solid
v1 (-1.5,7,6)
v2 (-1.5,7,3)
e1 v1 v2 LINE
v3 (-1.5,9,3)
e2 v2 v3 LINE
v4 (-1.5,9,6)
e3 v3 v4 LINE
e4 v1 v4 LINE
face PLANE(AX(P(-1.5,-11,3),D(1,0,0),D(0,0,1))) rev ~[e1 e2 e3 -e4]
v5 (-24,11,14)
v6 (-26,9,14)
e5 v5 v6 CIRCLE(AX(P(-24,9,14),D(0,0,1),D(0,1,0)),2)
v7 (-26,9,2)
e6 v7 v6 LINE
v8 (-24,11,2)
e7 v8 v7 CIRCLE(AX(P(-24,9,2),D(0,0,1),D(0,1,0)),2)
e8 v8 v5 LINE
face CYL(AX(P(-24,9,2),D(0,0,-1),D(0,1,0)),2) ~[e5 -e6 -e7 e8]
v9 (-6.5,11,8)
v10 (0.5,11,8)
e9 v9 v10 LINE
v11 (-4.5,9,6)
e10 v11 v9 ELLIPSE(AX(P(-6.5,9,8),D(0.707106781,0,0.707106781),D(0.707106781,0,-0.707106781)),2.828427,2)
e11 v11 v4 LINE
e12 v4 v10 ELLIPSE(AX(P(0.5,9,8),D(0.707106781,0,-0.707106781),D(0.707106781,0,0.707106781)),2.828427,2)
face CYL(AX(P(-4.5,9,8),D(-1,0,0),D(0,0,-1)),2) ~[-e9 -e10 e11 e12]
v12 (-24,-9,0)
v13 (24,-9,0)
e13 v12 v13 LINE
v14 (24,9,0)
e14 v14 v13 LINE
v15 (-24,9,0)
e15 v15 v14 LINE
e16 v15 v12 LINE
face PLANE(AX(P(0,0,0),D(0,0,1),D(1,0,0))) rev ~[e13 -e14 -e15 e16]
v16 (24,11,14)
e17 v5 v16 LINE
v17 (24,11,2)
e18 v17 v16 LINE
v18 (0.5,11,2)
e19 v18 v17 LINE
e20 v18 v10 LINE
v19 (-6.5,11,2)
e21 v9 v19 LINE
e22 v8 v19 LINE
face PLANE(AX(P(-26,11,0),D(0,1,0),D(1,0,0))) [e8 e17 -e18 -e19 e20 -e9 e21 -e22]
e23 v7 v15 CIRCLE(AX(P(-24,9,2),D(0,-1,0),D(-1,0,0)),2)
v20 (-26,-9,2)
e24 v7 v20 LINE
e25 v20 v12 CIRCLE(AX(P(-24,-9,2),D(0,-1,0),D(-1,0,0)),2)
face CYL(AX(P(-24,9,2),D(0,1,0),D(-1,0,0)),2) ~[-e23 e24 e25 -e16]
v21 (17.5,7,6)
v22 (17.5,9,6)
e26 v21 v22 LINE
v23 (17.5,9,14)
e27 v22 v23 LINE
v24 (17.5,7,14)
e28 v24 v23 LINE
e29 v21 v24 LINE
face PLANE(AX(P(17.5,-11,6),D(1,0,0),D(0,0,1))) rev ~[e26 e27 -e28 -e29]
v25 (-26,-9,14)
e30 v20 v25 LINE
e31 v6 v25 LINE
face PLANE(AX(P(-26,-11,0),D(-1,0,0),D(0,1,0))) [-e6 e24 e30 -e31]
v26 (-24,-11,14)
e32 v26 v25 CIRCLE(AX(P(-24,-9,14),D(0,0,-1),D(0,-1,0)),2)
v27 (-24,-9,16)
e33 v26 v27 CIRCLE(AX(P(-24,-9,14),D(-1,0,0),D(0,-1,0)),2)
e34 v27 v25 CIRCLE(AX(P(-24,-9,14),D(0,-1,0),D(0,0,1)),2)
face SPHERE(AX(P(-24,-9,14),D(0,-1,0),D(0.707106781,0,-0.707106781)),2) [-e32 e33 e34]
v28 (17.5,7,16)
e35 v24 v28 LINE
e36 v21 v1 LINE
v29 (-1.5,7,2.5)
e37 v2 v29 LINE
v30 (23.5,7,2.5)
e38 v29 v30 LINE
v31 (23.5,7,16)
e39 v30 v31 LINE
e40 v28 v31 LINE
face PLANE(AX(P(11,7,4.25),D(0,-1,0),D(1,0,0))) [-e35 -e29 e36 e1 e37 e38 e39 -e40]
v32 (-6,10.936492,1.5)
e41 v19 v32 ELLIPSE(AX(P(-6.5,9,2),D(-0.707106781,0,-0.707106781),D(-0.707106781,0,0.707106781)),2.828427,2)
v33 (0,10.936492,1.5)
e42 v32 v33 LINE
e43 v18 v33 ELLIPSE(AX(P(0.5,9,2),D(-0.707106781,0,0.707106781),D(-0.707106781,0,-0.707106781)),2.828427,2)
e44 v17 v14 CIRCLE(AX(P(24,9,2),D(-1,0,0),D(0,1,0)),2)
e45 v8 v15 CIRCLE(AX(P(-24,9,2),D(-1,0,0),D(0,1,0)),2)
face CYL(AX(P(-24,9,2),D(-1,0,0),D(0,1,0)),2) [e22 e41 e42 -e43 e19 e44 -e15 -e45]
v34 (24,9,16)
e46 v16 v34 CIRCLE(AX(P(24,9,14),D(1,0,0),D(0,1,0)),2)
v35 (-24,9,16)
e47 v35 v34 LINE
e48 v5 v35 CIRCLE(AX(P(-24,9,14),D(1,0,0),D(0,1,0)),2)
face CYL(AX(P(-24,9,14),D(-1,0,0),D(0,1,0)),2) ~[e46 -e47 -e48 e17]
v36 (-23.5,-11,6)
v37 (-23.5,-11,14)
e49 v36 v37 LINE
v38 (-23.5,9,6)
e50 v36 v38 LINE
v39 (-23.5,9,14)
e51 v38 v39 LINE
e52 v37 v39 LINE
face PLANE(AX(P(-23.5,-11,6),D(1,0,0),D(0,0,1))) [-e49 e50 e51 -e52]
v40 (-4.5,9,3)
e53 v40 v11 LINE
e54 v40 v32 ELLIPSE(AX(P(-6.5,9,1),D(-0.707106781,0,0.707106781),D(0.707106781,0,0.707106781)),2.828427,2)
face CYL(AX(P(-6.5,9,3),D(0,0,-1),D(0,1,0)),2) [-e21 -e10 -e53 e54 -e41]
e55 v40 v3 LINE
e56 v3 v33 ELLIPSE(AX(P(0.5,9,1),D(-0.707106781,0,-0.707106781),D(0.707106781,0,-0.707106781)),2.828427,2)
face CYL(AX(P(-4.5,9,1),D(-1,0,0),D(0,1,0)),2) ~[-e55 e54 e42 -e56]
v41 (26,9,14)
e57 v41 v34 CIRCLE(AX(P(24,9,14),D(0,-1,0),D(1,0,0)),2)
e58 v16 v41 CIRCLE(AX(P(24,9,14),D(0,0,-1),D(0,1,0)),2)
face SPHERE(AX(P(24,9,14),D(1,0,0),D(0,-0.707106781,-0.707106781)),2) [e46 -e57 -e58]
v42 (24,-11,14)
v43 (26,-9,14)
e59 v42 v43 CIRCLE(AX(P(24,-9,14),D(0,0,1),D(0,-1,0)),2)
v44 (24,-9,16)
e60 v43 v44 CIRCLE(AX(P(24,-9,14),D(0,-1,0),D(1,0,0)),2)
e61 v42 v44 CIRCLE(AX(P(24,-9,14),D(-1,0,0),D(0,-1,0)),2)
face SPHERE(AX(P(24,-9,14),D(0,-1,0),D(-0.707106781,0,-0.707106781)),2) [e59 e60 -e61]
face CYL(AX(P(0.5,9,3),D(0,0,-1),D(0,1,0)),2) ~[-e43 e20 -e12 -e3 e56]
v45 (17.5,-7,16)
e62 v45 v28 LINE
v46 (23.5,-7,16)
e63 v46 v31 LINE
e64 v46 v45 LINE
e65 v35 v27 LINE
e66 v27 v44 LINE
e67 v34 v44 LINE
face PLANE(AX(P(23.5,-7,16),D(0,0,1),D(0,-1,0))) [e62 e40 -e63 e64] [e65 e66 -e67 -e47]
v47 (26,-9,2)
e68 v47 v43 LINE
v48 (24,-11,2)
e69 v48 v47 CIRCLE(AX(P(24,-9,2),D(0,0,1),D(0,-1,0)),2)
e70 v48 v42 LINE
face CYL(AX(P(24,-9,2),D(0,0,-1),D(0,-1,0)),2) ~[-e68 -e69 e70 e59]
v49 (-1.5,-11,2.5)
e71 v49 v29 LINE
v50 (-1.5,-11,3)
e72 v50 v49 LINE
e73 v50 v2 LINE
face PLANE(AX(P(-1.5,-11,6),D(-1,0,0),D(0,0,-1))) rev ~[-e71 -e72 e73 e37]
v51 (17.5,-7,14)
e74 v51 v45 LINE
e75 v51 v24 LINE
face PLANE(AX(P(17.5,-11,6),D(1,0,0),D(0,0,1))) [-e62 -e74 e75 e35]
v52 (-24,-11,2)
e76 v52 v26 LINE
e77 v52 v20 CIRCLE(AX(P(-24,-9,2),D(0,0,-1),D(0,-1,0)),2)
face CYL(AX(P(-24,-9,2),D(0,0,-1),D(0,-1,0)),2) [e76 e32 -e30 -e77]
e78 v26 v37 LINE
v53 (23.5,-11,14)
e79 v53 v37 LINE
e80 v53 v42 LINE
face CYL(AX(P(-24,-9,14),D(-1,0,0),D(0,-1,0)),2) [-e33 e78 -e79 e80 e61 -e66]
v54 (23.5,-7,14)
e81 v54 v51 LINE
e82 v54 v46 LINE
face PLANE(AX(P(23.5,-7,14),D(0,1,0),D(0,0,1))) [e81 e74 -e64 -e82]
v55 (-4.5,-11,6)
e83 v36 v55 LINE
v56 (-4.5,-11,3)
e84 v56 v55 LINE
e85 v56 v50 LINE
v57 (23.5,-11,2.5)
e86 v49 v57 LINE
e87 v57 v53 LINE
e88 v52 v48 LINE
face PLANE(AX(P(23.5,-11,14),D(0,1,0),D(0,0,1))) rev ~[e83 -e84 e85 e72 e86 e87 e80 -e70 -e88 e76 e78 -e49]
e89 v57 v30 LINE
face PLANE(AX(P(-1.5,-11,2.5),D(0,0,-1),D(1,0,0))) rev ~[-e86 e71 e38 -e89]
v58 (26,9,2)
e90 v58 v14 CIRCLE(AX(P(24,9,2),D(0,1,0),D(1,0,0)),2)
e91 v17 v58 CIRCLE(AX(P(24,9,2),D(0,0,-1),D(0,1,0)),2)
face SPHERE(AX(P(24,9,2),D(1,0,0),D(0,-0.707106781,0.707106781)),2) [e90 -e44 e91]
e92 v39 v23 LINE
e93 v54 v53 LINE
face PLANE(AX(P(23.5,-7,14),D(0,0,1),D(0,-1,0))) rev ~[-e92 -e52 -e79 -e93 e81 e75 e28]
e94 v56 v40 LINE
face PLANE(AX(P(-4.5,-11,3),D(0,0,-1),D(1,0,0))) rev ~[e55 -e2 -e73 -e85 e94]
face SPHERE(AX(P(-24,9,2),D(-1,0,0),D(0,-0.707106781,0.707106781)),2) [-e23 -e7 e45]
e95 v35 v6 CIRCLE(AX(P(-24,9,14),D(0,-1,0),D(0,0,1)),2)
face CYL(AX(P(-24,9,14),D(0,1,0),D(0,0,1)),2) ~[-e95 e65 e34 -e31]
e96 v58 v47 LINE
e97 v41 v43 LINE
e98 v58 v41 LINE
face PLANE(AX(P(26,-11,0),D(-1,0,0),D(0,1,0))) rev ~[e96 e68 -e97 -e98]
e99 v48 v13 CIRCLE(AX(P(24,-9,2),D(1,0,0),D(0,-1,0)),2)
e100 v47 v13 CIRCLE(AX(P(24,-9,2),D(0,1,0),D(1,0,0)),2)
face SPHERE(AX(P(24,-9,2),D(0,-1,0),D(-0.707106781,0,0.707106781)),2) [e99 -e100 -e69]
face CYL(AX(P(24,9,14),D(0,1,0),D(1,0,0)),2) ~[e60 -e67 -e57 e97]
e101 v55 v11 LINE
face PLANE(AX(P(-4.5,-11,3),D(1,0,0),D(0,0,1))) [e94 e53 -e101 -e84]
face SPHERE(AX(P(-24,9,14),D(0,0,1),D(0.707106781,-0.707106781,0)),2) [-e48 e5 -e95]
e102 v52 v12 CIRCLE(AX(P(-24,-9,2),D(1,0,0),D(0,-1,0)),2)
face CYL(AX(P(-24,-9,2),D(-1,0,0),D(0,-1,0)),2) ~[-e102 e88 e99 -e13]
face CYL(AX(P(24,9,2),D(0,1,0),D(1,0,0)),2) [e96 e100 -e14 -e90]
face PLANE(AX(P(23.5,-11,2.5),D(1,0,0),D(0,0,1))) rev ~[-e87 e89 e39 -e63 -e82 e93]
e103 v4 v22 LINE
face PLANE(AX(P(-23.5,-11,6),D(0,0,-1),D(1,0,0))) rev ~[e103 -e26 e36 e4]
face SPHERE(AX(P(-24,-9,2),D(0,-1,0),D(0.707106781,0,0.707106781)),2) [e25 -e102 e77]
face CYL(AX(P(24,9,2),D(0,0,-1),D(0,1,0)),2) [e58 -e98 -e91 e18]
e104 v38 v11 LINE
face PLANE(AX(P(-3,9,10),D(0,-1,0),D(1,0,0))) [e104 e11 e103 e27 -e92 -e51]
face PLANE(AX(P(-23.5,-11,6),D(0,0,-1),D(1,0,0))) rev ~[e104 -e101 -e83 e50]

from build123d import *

# Parameters (mm, degrees)
F0_W           = 52
F0_H           = 22
F1_DEPTH       = 16
F2_W           = 41
F2_H           = 8
F3_DEPTH       = 20
F4_W           = 6
F4_H           = 10
F5_DEPTH       = 18
F6_W           = 3
F6_H           = 3
F7_DEPTH       = 22
F8_W           = 4
F8_H           = 2
F9_DEPTH       = 6
F10_T1_DEPTH   = 18
F10_T3_DEPTH   = 12
F10_T5_DEPTH   = 48
F10_T7_DEPTH   = 3
F10_T9_DEPTH   = 3
F10_S13_W      = 2
F10_S13_H      = 2
F10_T14_DEPTH  = 2
F10_S19_W      = 2
F10_S19_H      = 2
F10_T20_DEPTH  = 2
F10_S25_W      = 2
F10_S25_H      = 2
F10_T26_DEPTH  = 2
F10_S31_W      = 2
F10_S31_H      = 2
F10_T32_DEPTH  = 2
F10_S37_W      = 2
F10_S37_H      = 2
F10_T38_DEPTH  = 2
F10_S43_W      = 2
F10_S43_H      = 2
F10_T44_DEPTH  = 2
F10_S49_W      = 2
F10_S49_H      = 2
F10_T50_DEPTH  = 2
F10_S55_W      = 2
F10_S55_H      = 2
F10_T56_DEPTH  = 2
F10_T63_DEPTH  = 8
F10_T67_DEPTH  = 8
F10_T74_DEPTH  = 8
F10_T78_DEPTH  = 8
F10_T85_DEPTH  = 8
F10_T89_DEPTH  = 8
F10_T96_DEPTH  = 8
F10_T100_DEPTH = 8


# Not quite as in the source:
# - a fillet or chamfer that OpenCascade refuses, or shapes differently, is made with other operations: its cross-section is extruded or revolved along the edge and cut away or added


with BuildPart() as f1:
    # F0 (on Top) → F1 (new body)
    with BuildSketch(Plane.XY):
        Rectangle(F0_W, F0_H)
    extrude(amount=F1_DEPTH)

    # F2 (on face) → F3 (cut)
    with BuildSketch(Plane.XZ.offset(11)):
        with Locations((-3, 10)):
            Rectangle(F2_W, F2_H)
    extrude(amount=-F3_DEPTH, mode=Mode.SUBTRACT)

    # F4 (on face) → F5 (cut)
    with BuildSketch(Plane.XZ.offset(11)):
        Polygon((17.5, 6), (-1.5, 6), (-1.5, 2.5), (23.5, 2.5), (23.5, 6), align=None)
        with Locations((20.5, 11)):
            Rectangle(F4_W, F4_H)
    extrude(amount=-F5_DEPTH, mode=Mode.SUBTRACT)

    # F6 (on face) → F7 (cut, through all)
    with BuildSketch(Plane.XZ.offset(11)):
        with Locations((-3, 4.5)):
            Rectangle(F6_W, F6_H)
    extrude(amount=-F7_DEPTH, mode=Mode.SUBTRACT)

    # F8 (on face) → F9 (join)
    with BuildSketch(Plane(origin=(23.5, 0, 0), x_dir=(0, -1, 0), z_dir=(-1, 0, 0))):
        with Locations((9, 15)):
            Rectangle(F8_W, F8_H)
    extrude(amount=F9_DEPTH)

    # F10: fillet of radius 2 on 16 edges, made by hand

    # F10_s2 → F10_t1 (cut)
    with BuildSketch(Plane.XZ.offset(-9)):
        with BuildLine():
            ThreePointArc((-26, 2), (-25.4142135624, 0.5857864376), (-24, 0))
            Line((-24, 0), (-26, 0))
            Line((-26, 0), (-26, 2))
        make_face()
        with BuildLine():
            ThreePointArc((-24, 16), (-25.4142135624, 15.4142135624), (-26, 14))
            Line((-26, 14), (-26, 16))
            Line((-26, 16), (-24, 16))
        make_face()
        with BuildLine():
            ThreePointArc((26, 14), (25.4142135624, 15.4142135624), (24, 16))
            Line((24, 16), (26, 16))
            Line((26, 16), (26, 14))
        make_face()
        with BuildLine():
            ThreePointArc((26, 2), (25.4142135624, 0.5857864376), (24, 0))
            Line((24, 0), (26, 0))
            Line((26, 0), (26, 2))
        make_face()
    extrude(amount=F10_T1_DEPTH, mode=Mode.SUBTRACT)

    # F10_s4 → F10_t3 (cut)
    with BuildSketch(Plane.XY.offset(2)):
        with BuildLine():
            ThreePointArc((-24, -11), (-25.4142135624, -10.4142135624), (-26, -9))
            Line((-26, -9), (-26, -11))
            Line((-26, -11), (-24, -11))
        make_face()
        with BuildLine():
            ThreePointArc((24, -11), (25.4142135624, -10.4142135624), (26, -9))
            Line((26, -9), (26, -11))
            Line((26, -11), (24, -11))
        make_face()
        with BuildLine():
            ThreePointArc((24, 11), (25.4142135624, 10.4142135624), (26, 9))
            Line((26, 9), (26, 11))
            Line((26, 11), (24, 11))
        make_face()
        with BuildLine():
            ThreePointArc((-24, 11), (-25.4142135624, 10.4142135624), (-26, 9))
            Line((-26, 9), (-26, 11))
            Line((-26, 11), (-24, 11))
        make_face()
    extrude(amount=F10_T3_DEPTH, mode=Mode.SUBTRACT)

    # F10_s6 → F10_t5 (cut)
    with BuildSketch(Plane.YZ.offset(-24)):
        with BuildLine():
            ThreePointArc((-11, 14), (-10.4142135624, 15.4142135624), (-9, 16))
            Line((-9, 16), (-11, 16))
            Line((-11, 16), (-11, 14))
        make_face()
        with BuildLine():
            ThreePointArc((-11, 2), (-10.4142135624, 0.5857864376), (-9, 0))
            Line((-9, 0), (-11, 0))
            Line((-11, 0), (-11, 2))
        make_face()
        with BuildLine():
            ThreePointArc((11, 14), (10.4142135624, 15.4142135624), (9, 16))
            Line((9, 16), (11, 16))
            Line((11, 16), (11, 14))
        make_face()
        with BuildLine():
            ThreePointArc((11, 2), (10.4142135624, 0.5857864376), (9, 0))
            Line((9, 0), (11, 0))
            Line((11, 0), (11, 2))
        make_face()
    extrude(amount=F10_T5_DEPTH, mode=Mode.SUBTRACT)

    # F10_s8 → F10_t7 (cut)
    with BuildSketch(Plane.YZ.offset(-4.5)):
        with BuildLine():
            ThreePointArc((9, 6), (10.4142135624, 6.5857864376), (11, 8))
            Line((11, 8), (11, 6))
            Line((11, 6), (9, 6))
        make_face()
        with BuildLine():
            ThreePointArc((11, 1), (10.4142135624, 2.4142135624), (9, 3))
            Line((9, 3), (11, 3))
            Line((11, 3), (11, 1))
        make_face()
    extrude(amount=F10_T7_DEPTH, mode=Mode.SUBTRACT)

    # F10_s10 → F10_t9 (cut)
    with BuildSketch(Plane.XY.offset(3)):
        with BuildLine():
            ThreePointArc((-6.5, 11), (-5.0857864376, 10.4142135624), (-4.5, 9))
            Line((-4.5, 9), (-4.5, 11))
            Line((-4.5, 11), (-6.5, 11))
        make_face()
        with BuildLine():
            ThreePointArc((0.5, 11), (-0.9142135624, 10.4142135624), (-1.5, 9))
            Line((-1.5, 9), (-1.5, 11))
            Line((-1.5, 11), (0.5, 11))
        make_face()
    extrude(amount=F10_T9_DEPTH, mode=Mode.SUBTRACT)


with BuildPart() as f10_tool12:
    # F10_s13 → F10_t14 (new body)
    with BuildSketch(Plane.YZ.offset(-24)):
        with Locations((10, 1)):
            Rectangle(F10_S13_W, F10_S13_H)
    extrude(amount=-F10_T14_DEPTH)

    # F10_s15 → F10_t16 (revolve, cut)
    with BuildSketch(Plane(origin=(-24, 9, 2), x_dir=(0, -0.7071067812, 0.7071067812), z_dir=(0, -0.7071067812, -0.7071067812))):
        with BuildLine():
            ThreePointArc((0, -2), (2, 0), (0, 2))
            Line((0, 2), (0, -2))
        make_face()
    revolve(axis=Axis((-24, 9, 2), (-1, 0, 0)), mode=Mode.SUBTRACT)


with BuildPart() as f1_1:
    add(f1.part)

    # F10_t11: cut F10_tool12
    add(f10_tool12.part, mode=Mode.SUBTRACT)


with BuildPart() as f10_tool18:
    # F10_s19 → F10_t20 (new body)
    with BuildSketch(Plane.XZ.offset(9)):
        with Locations((-25, 1)):
            Rectangle(F10_S19_W, F10_S19_H)
    extrude(amount=F10_T20_DEPTH)

    # F10_s21 → F10_t22 (revolve, cut)
    with BuildSketch(Plane(origin=(-24, -9, 2), x_dir=(0.7071067812, 0, 0.7071067812), z_dir=(0.7071067812, 0, -0.7071067812))):
        with BuildLine():
            ThreePointArc((0, -2), (2, 0), (0, 2))
            Line((0, 2), (0, -2))
        make_face()
    revolve(axis=Axis((-24, -9, 2), (0, -1, 0)), mode=Mode.SUBTRACT)


with BuildPart() as f1_2:
    add(f1_1.part)

    # F10_t17: cut F10_tool18
    add(f10_tool18.part, mode=Mode.SUBTRACT)


with BuildPart() as f10_tool24:
    # F10_s25 → F10_t26 (new body)
    with BuildSketch(Plane.XZ.offset(9)):
        with Locations((-25, 15)):
            Rectangle(F10_S25_W, F10_S25_H)
    extrude(amount=F10_T26_DEPTH)

    # F10_s27 → F10_t28 (revolve, cut)
    with BuildSketch(Plane(origin=(-24, -9, 14), x_dir=(0.7071067812, 0, -0.7071067812), z_dir=(-0.7071067812, 0, -0.7071067812))):
        with BuildLine():
            ThreePointArc((0, -2), (2, 0), (0, 2))
            Line((0, 2), (0, -2))
        make_face()
    revolve(axis=Axis((-24, -9, 14), (0, -1, 0)), mode=Mode.SUBTRACT)


with BuildPart() as f1_3:
    add(f1_2.part)

    # F10_t23: cut F10_tool24
    add(f10_tool24.part, mode=Mode.SUBTRACT)


with BuildPart() as f10_tool30:
    # F10_s31 → F10_t32 (new body)
    with BuildSketch(Plane.XZ.offset(9)):
        with Locations((25, 15)):
            Rectangle(F10_S31_W, F10_S31_H)
    extrude(amount=F10_T32_DEPTH)

    # F10_s33 → F10_t34 (revolve, cut)
    with BuildSketch(Plane(origin=(24, -9, 14), x_dir=(-0.7071067812, 0, -0.7071067812), z_dir=(-0.7071067812, 0, 0.7071067812))):
        with BuildLine():
            ThreePointArc((0, -2), (2, 0), (0, 2))
            Line((0, 2), (0, -2))
        make_face()
    revolve(axis=Axis((24, -9, 14), (0, -1, 0)), mode=Mode.SUBTRACT)


with BuildPart() as f1_4:
    add(f1_3.part)

    # F10_t29: cut F10_tool30
    add(f10_tool30.part, mode=Mode.SUBTRACT)


with BuildPart() as f10_tool36:
    # F10_s37 → F10_t38 (new body)
    with BuildSketch(Plane.XY.offset(14)):
        with Locations((-25, 10)):
            Rectangle(F10_S37_W, F10_S37_H)
    extrude(amount=F10_T38_DEPTH)

    # F10_s39 → F10_t40 (revolve, cut)
    with BuildSketch(Plane(origin=(-24, 9, 14), x_dir=(0.7071067812, -0.7071067812, 0), z_dir=(-0.7071067812, -0.7071067812, 0))):
        with BuildLine():
            ThreePointArc((0, -2), (2, 0), (0, 2))
            Line((0, 2), (0, -2))
        make_face()
    revolve(axis=Axis((-24, 9, 14), (0, 0, 1)), mode=Mode.SUBTRACT)


with BuildPart() as f1_5:
    add(f1_4.part)

    # F10_t35: cut F10_tool36
    add(f10_tool36.part, mode=Mode.SUBTRACT)


with BuildPart() as f10_tool42:
    # F10_s43 → F10_t44 (new body)
    with BuildSketch(Plane.XZ.offset(9)):
        with Locations((25, 1)):
            Rectangle(F10_S43_W, F10_S43_H)
    extrude(amount=F10_T44_DEPTH)

    # F10_s45 → F10_t46 (revolve, cut)
    with BuildSketch(Plane(origin=(24, -9, 2), x_dir=(-0.7071067812, 0, 0.7071067812), z_dir=(0.7071067812, 0, 0.7071067812))):
        with BuildLine():
            ThreePointArc((0, -2), (2, 0), (0, 2))
            Line((0, 2), (0, -2))
        make_face()
    revolve(axis=Axis((24, -9, 2), (0, -1, 0)), mode=Mode.SUBTRACT)


with BuildPart() as f1_6:
    add(f1_5.part)

    # F10_t41: cut F10_tool42
    add(f10_tool42.part, mode=Mode.SUBTRACT)


with BuildPart() as f10_tool48:
    # F10_s49 → F10_t50 (new body)
    with BuildSketch(Plane.YZ.offset(24)):
        with Locations((10, 15)):
            Rectangle(F10_S49_W, F10_S49_H)
    extrude(amount=F10_T50_DEPTH)

    # F10_s51 → F10_t52 (revolve, cut)
    with BuildSketch(Plane(origin=(24, 9, 14), x_dir=(0, -0.7071067812, -0.7071067812), z_dir=(0, -0.7071067812, 0.7071067812))):
        with BuildLine():
            ThreePointArc((0, -2), (2, 0), (0, 2))
            Line((0, 2), (0, -2))
        make_face()
    revolve(axis=Axis((24, 9, 14), (1, 0, 0)), mode=Mode.SUBTRACT)


with BuildPart() as f1_7:
    add(f1_6.part)

    # F10_t47: cut F10_tool48
    add(f10_tool48.part, mode=Mode.SUBTRACT)


with BuildPart() as f10_tool54:
    # F10_s55 → F10_t56 (new body)
    with BuildSketch(Plane.YZ.offset(24)):
        with Locations((10, 1)):
            Rectangle(F10_S55_W, F10_S55_H)
    extrude(amount=F10_T56_DEPTH)

    # F10_s57 → F10_t58 (revolve, cut)
    with BuildSketch(Plane(origin=(24, 9, 2), x_dir=(0, -0.7071067812, 0.7071067812), z_dir=(0, 0.7071067812, 0.7071067812))):
        with BuildLine():
            ThreePointArc((0, -2), (2, 0), (0, 2))
            Line((0, 2), (0, -2))
        make_face()
    revolve(axis=Axis((24, 9, 2), (1, 0, 0)), mode=Mode.SUBTRACT)


with BuildPart() as f1_8:
    add(f1_7.part)

    # F10_t53: cut F10_tool54
    add(f10_tool54.part, mode=Mode.SUBTRACT)


with BuildPart() as f10_tool61:
    # F10_s62 → F10_t63 (new body)
    with BuildSketch(Plane.YZ.offset(3.5)):
        with BuildLine():
            ThreePointArc((9, 6), (10.4142135624, 6.5857864376), (11, 8))
            Line((11, 8), (11, 6))
            Line((11, 6), (9, 6))
        make_face()
    extrude(amount=-F10_T63_DEPTH)

    split(bisect_by=Plane.YZ.offset(-1.5), keep=Keep.TOP)


with BuildPart() as f10_tool65:
    # F10_s66 → F10_t67 (new body)
    with BuildSketch(Plane.XY.offset(3)):
        with BuildLine():
            ThreePointArc((0.5, 11), (-0.9142135624, 10.4142135624), (-1.5, 9))
            Line((-1.5, 9), (-1.5, 11))
            Line((-1.5, 11), (0.5, 11))
        make_face()
    extrude(amount=F10_T67_DEPTH)

    split(bisect_by=Plane.XY.offset(6), keep=Keep.TOP)


with BuildPart() as f10_tool61_1:
    add(f10_tool61.part)

    # F10_t69: intersect F10_tool65
    add(f10_tool65.part, mode=Mode.INTERSECT)


with BuildPart() as f1_9:
    add(f1_8.part)

    # F10_t59: cut F10_tool61
    add(f10_tool61_1.part, mode=Mode.SUBTRACT)


with BuildPart() as f10_tool72:
    # F10_s73 → F10_t74 (new body)
    with BuildSketch(Plane.YZ.offset(-1.5)):
        with BuildLine():
            ThreePointArc((9, 6), (10.4142135624, 6.5857864376), (11, 8))
            Line((11, 8), (11, 6))
            Line((11, 6), (9, 6))
        make_face()
    extrude(amount=-F10_T74_DEPTH)

    split(bisect_by=Plane.YZ.offset(-4.5), keep=Keep.BOTTOM)


with BuildPart() as f10_tool76:
    # F10_s77 → F10_t78 (new body)
    with BuildSketch(Plane.XY.offset(11)):
        with BuildLine():
            ThreePointArc((-6.5, 11), (-5.0857864376, 10.4142135624), (-4.5, 9))
            Line((-4.5, 9), (-4.5, 11))
            Line((-4.5, 11), (-6.5, 11))
        make_face()
    extrude(amount=-F10_T78_DEPTH)

    split(bisect_by=Plane.XY.offset(6), keep=Keep.TOP)


with BuildPart() as f10_tool72_1:
    add(f10_tool72.part)

    # F10_t80: intersect F10_tool76
    add(f10_tool76.part, mode=Mode.INTERSECT)


with BuildPart() as f1_10:
    add(f1_9.part)

    # F10_t70: cut F10_tool72
    add(f10_tool72_1.part, mode=Mode.SUBTRACT)


with BuildPart() as f10_tool83:
    # F10_s84 → F10_t85 (new body)
    with BuildSketch(Plane.XY.offset(6)):
        with BuildLine():
            ThreePointArc((-6.5, 11), (-5.0857864376, 10.4142135624), (-4.5, 9))
            Line((-4.5, 9), (-4.5, 11))
            Line((-4.5, 11), (-6.5, 11))
        make_face()
    extrude(amount=-F10_T85_DEPTH)

    split(bisect_by=Plane.XY.offset(3), keep=Keep.BOTTOM)


with BuildPart() as f10_tool87:
    # F10_s88 → F10_t89 (new body)
    with BuildSketch(Plane.YZ.offset(-9.5)):
        with BuildLine():
            ThreePointArc((11, 1), (10.4142135624, 2.4142135624), (9, 3))
            Line((9, 3), (11, 3))
            Line((11, 3), (11, 1))
        make_face()
    extrude(amount=F10_T89_DEPTH)

    split(bisect_by=Plane.YZ.offset(-4.5), keep=Keep.BOTTOM)


with BuildPart() as f10_tool83_1:
    add(f10_tool83.part)

    # F10_t91: intersect F10_tool87
    add(f10_tool87.part, mode=Mode.INTERSECT)


with BuildPart() as f1_11:
    add(f1_10.part)

    # F10_t81: cut F10_tool83
    add(f10_tool83_1.part, mode=Mode.SUBTRACT)


with BuildPart() as f10_tool94:
    # F10_s95 → F10_t96 (new body)
    with BuildSketch(Plane.XY.offset(-2)):
        with BuildLine():
            ThreePointArc((0.5, 11), (-0.9142135624, 10.4142135624), (-1.5, 9))
            Line((-1.5, 9), (-1.5, 11))
            Line((-1.5, 11), (0.5, 11))
        make_face()
    extrude(amount=F10_T96_DEPTH)

    split(bisect_by=Plane.XY.offset(3), keep=Keep.BOTTOM)


with BuildPart() as f10_tool98:
    # F10_s99 → F10_t100 (new body)
    with BuildSketch(Plane.YZ.offset(-4.5)):
        with BuildLine():
            ThreePointArc((11, 1), (10.4142135624, 2.4142135624), (9, 3))
            Line((9, 3), (11, 3))
            Line((11, 3), (11, 1))
        make_face()
    extrude(amount=F10_T100_DEPTH)

    split(bisect_by=Plane.YZ.offset(-1.5), keep=Keep.TOP)


with BuildPart() as f10_tool94_1:
    add(f10_tool94.part)

    # F10_t102: intersect F10_tool98
    add(f10_tool98.part, mode=Mode.INTERSECT)


with BuildPart() as f1_12:
    add(f1_11.part)

    # F10_t92: cut F10_tool94
    add(f10_tool94_1.part, mode=Mode.SUBTRACT)


solid = f1_12.part
